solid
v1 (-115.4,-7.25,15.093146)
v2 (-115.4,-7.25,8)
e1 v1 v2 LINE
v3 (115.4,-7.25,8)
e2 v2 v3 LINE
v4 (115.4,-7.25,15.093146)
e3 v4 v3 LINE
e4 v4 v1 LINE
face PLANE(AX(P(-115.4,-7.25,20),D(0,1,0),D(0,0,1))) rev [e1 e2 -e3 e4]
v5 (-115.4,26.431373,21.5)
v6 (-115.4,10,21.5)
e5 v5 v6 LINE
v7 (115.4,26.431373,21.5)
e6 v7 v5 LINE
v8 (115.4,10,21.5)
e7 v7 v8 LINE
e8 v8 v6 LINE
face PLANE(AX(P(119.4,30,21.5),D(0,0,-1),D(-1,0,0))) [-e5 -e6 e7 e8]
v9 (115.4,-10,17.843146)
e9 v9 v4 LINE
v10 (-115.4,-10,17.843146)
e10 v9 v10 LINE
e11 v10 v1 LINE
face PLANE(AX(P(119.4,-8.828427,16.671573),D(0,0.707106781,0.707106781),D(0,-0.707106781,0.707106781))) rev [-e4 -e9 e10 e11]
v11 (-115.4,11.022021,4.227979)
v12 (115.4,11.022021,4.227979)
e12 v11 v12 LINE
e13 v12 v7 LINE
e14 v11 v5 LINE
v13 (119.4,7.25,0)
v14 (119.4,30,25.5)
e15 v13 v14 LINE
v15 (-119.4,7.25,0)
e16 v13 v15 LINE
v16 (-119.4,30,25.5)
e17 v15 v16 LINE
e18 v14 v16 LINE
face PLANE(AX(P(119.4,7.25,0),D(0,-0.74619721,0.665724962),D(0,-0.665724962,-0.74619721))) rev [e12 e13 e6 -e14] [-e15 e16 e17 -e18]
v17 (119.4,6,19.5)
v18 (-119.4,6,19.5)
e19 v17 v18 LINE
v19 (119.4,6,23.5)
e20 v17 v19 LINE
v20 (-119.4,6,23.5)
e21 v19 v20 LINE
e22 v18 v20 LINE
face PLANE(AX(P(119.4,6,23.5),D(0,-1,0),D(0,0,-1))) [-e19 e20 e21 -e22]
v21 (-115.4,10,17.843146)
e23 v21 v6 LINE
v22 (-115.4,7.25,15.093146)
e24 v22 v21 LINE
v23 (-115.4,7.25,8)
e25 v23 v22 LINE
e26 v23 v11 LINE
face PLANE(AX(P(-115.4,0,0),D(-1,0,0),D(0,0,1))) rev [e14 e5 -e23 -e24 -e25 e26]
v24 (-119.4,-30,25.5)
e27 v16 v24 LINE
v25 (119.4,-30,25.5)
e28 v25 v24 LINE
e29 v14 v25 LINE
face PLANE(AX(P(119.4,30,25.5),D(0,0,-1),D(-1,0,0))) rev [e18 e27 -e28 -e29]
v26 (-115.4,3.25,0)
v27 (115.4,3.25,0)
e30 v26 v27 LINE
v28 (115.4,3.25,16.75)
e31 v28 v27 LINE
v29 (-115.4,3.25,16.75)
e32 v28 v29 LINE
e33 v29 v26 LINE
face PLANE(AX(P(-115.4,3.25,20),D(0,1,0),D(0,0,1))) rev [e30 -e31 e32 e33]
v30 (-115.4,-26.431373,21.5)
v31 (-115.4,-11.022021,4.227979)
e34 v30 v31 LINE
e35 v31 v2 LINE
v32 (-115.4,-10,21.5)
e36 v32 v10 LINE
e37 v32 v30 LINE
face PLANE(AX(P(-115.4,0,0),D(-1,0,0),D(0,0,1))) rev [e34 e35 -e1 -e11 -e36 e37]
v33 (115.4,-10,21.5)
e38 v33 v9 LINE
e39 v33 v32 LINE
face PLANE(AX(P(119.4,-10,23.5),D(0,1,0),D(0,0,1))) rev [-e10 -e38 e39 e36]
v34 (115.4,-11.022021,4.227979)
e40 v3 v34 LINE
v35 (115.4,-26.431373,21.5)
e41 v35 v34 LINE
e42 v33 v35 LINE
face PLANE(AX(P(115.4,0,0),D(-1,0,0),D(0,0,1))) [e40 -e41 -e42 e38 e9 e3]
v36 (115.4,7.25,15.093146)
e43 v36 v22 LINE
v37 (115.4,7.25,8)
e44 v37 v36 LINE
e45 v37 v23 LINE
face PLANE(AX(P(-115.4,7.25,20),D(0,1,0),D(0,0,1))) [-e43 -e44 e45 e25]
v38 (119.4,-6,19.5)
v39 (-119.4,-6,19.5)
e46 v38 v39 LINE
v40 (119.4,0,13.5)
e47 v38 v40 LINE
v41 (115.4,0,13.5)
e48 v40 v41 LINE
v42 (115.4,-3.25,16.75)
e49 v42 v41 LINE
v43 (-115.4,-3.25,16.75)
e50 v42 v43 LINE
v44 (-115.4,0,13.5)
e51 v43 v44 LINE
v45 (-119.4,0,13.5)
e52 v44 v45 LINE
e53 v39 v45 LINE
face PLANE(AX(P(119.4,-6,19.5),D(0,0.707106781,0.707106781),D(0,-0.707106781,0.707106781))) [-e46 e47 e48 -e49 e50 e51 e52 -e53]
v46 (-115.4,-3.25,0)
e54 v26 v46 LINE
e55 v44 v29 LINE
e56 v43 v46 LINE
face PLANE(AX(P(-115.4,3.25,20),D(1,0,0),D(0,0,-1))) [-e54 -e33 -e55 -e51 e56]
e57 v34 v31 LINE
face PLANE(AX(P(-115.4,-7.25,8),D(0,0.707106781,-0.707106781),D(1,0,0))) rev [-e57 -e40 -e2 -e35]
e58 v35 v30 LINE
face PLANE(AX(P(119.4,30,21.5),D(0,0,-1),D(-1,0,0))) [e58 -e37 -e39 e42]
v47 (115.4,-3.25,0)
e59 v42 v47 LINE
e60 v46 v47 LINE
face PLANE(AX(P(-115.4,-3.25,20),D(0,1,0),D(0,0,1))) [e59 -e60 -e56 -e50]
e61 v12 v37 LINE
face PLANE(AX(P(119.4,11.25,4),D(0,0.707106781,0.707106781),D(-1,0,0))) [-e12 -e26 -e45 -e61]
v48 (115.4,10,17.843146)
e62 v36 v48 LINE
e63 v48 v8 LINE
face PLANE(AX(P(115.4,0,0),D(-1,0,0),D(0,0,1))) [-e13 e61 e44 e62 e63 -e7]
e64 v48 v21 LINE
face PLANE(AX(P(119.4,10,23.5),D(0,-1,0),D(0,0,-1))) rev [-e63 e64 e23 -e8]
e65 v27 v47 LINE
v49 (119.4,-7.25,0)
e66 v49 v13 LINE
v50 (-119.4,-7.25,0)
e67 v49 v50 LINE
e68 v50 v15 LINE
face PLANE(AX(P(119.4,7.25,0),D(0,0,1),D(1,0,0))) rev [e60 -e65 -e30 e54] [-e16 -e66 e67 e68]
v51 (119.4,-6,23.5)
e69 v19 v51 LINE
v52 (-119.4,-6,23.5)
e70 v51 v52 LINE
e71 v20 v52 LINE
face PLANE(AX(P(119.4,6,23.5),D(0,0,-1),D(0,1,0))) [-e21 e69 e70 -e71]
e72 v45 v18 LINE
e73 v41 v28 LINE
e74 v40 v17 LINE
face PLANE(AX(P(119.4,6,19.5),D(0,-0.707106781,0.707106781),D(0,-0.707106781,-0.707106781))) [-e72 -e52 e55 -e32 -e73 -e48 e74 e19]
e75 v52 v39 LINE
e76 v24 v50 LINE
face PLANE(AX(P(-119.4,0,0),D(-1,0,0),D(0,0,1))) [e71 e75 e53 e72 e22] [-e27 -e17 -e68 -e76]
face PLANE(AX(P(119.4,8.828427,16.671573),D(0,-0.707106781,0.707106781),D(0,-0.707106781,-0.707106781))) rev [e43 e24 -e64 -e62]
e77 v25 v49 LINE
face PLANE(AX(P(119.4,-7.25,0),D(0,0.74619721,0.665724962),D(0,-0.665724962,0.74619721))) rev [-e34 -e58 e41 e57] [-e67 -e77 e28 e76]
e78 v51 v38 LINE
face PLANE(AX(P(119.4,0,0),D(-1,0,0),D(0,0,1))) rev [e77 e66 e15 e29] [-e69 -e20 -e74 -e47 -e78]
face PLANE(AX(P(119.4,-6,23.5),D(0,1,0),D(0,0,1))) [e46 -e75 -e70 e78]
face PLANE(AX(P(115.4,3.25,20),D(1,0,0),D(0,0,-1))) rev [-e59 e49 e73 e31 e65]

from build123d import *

# Parameters (mm, degrees)
BOSS_EXTRUDE1_DEPTH      = 119.4
BOSS_EXTRUDE1_DEPTH_BACK = 119.4
SKETCH1_W                = 230.8
SKETCH1_H                = 6.5
CUT_EXTRUDE1_DEPTH       = 20
SHELL1_START             = -115.4
SHELL1_DEPTH             = 230.8
CHAMFER1_SIZE            = 4


# Read off the part's stored shape, not the designer's step: Shell1
with BuildPart() as part:
    # Sketch4 → Boss-Extrude1 (new, two sides: drawn at the far end of the back side and taken through both)
    with BuildSketch(Plane(origin=(0, 0, 0), x_dir=(0, 0, -1), z_dir=(1, 0, 0)).offset(-BOSS_EXTRUDE1_DEPTH_BACK)):
        Polygon((0, 7.25), (-25.5, 30), (-25.5, -30), (0, -7.25), align=None)
        Polygon((-23.5, 6), (-23.5, -6), (-19.5, -6), (-13.5, 0), (-19.5, 6), align=None, mode=Mode.SUBTRACT)
    extrude(amount=BOSS_EXTRUDE1_DEPTH + BOSS_EXTRUDE1_DEPTH_BACK)

    # Sketch1 → Cut-Extrude1 (cut)
    with BuildSketch(Plane.XY):
        Rectangle(SKETCH1_W, SKETCH1_H)
    extrude(amount=CUT_EXTRUDE1_DEPTH, mode=Mode.SUBTRACT)

    # Shell1 outline → Shell1 (cut)
    with BuildSketch(Plane.YZ.offset(SHELL1_START)):
        Polygon((-10, 21.5), (-26.431372549, 21.5), (-10.818627451, 4), (-7.25, 4), (-7.25, 15.093145751), (-10, 17.843145751), align=None)
        Polygon((26.431372549, 21.5), (10, 21.5), (10, 17.843145751), (7.25, 15.093145751), (7.25, 4), (10.818627451, 4), align=None)
    extrude(amount=SHELL1_DEPTH, mode=Mode.SUBTRACT)

    # Chamfer1
    # the kernel refuses this chamfer: 4 mm, written as the material it adds along each edge
    with BuildSketch(Plane(origin=(-115.4, -7.25, 4), x_dir=(0, -0.9996219169112968, -0.02749587661058638), z_dir=(1, 0, 0))) as chamfer1_piece_1_section:
        Polygon((CHAMFER1_SIZE * 0.999621916911, -CHAMFER1_SIZE * 0.0274958766106), (-CHAMFER1_SIZE * 0.0274958766106, -CHAMFER1_SIZE * 0.999621916911), (0, 0), align=None)
    chamfer1_piece_1 = extrude(amount=230.8, mode=Mode.PRIVATE)
    chamfer1_piece_1 = split(chamfer1_piece_1, bisect_by=Plane(origin=(0, -10.469830587, 3.609040878), z_dir=(0, 0.7461972096049123, 0.6657249615102642)), keep=Keep.TOP, mode=Mode.PRIVATE)
    add(chamfer1_piece_1)
    with BuildSketch(Plane(origin=(-115.4, 7.25, 4), x_dir=(0, 0.9996219169112968, -0.02749587661058638), z_dir=(1, 0, 0))) as chamfer1_piece_2_section:
        Polygon((CHAMFER1_SIZE * 0.999621916911, CHAMFER1_SIZE * 0.0274958766106), (-CHAMFER1_SIZE * 0.0274958766106, CHAMFER1_SIZE * 0.999621916911), (0, 0), align=None)
    chamfer1_piece_2 = extrude(amount=230.8, mode=Mode.PRIVATE)
    chamfer1_piece_2 = split(chamfer1_piece_2, bisect_by=Plane(origin=(0, 10.469830587, 3.609040878), z_dir=(0, -0.7461972096049116, 0.6657249615102648)), keep=Keep.TOP, mode=Mode.PRIVATE)
    add(chamfer1_piece_2)


solid = part.part
